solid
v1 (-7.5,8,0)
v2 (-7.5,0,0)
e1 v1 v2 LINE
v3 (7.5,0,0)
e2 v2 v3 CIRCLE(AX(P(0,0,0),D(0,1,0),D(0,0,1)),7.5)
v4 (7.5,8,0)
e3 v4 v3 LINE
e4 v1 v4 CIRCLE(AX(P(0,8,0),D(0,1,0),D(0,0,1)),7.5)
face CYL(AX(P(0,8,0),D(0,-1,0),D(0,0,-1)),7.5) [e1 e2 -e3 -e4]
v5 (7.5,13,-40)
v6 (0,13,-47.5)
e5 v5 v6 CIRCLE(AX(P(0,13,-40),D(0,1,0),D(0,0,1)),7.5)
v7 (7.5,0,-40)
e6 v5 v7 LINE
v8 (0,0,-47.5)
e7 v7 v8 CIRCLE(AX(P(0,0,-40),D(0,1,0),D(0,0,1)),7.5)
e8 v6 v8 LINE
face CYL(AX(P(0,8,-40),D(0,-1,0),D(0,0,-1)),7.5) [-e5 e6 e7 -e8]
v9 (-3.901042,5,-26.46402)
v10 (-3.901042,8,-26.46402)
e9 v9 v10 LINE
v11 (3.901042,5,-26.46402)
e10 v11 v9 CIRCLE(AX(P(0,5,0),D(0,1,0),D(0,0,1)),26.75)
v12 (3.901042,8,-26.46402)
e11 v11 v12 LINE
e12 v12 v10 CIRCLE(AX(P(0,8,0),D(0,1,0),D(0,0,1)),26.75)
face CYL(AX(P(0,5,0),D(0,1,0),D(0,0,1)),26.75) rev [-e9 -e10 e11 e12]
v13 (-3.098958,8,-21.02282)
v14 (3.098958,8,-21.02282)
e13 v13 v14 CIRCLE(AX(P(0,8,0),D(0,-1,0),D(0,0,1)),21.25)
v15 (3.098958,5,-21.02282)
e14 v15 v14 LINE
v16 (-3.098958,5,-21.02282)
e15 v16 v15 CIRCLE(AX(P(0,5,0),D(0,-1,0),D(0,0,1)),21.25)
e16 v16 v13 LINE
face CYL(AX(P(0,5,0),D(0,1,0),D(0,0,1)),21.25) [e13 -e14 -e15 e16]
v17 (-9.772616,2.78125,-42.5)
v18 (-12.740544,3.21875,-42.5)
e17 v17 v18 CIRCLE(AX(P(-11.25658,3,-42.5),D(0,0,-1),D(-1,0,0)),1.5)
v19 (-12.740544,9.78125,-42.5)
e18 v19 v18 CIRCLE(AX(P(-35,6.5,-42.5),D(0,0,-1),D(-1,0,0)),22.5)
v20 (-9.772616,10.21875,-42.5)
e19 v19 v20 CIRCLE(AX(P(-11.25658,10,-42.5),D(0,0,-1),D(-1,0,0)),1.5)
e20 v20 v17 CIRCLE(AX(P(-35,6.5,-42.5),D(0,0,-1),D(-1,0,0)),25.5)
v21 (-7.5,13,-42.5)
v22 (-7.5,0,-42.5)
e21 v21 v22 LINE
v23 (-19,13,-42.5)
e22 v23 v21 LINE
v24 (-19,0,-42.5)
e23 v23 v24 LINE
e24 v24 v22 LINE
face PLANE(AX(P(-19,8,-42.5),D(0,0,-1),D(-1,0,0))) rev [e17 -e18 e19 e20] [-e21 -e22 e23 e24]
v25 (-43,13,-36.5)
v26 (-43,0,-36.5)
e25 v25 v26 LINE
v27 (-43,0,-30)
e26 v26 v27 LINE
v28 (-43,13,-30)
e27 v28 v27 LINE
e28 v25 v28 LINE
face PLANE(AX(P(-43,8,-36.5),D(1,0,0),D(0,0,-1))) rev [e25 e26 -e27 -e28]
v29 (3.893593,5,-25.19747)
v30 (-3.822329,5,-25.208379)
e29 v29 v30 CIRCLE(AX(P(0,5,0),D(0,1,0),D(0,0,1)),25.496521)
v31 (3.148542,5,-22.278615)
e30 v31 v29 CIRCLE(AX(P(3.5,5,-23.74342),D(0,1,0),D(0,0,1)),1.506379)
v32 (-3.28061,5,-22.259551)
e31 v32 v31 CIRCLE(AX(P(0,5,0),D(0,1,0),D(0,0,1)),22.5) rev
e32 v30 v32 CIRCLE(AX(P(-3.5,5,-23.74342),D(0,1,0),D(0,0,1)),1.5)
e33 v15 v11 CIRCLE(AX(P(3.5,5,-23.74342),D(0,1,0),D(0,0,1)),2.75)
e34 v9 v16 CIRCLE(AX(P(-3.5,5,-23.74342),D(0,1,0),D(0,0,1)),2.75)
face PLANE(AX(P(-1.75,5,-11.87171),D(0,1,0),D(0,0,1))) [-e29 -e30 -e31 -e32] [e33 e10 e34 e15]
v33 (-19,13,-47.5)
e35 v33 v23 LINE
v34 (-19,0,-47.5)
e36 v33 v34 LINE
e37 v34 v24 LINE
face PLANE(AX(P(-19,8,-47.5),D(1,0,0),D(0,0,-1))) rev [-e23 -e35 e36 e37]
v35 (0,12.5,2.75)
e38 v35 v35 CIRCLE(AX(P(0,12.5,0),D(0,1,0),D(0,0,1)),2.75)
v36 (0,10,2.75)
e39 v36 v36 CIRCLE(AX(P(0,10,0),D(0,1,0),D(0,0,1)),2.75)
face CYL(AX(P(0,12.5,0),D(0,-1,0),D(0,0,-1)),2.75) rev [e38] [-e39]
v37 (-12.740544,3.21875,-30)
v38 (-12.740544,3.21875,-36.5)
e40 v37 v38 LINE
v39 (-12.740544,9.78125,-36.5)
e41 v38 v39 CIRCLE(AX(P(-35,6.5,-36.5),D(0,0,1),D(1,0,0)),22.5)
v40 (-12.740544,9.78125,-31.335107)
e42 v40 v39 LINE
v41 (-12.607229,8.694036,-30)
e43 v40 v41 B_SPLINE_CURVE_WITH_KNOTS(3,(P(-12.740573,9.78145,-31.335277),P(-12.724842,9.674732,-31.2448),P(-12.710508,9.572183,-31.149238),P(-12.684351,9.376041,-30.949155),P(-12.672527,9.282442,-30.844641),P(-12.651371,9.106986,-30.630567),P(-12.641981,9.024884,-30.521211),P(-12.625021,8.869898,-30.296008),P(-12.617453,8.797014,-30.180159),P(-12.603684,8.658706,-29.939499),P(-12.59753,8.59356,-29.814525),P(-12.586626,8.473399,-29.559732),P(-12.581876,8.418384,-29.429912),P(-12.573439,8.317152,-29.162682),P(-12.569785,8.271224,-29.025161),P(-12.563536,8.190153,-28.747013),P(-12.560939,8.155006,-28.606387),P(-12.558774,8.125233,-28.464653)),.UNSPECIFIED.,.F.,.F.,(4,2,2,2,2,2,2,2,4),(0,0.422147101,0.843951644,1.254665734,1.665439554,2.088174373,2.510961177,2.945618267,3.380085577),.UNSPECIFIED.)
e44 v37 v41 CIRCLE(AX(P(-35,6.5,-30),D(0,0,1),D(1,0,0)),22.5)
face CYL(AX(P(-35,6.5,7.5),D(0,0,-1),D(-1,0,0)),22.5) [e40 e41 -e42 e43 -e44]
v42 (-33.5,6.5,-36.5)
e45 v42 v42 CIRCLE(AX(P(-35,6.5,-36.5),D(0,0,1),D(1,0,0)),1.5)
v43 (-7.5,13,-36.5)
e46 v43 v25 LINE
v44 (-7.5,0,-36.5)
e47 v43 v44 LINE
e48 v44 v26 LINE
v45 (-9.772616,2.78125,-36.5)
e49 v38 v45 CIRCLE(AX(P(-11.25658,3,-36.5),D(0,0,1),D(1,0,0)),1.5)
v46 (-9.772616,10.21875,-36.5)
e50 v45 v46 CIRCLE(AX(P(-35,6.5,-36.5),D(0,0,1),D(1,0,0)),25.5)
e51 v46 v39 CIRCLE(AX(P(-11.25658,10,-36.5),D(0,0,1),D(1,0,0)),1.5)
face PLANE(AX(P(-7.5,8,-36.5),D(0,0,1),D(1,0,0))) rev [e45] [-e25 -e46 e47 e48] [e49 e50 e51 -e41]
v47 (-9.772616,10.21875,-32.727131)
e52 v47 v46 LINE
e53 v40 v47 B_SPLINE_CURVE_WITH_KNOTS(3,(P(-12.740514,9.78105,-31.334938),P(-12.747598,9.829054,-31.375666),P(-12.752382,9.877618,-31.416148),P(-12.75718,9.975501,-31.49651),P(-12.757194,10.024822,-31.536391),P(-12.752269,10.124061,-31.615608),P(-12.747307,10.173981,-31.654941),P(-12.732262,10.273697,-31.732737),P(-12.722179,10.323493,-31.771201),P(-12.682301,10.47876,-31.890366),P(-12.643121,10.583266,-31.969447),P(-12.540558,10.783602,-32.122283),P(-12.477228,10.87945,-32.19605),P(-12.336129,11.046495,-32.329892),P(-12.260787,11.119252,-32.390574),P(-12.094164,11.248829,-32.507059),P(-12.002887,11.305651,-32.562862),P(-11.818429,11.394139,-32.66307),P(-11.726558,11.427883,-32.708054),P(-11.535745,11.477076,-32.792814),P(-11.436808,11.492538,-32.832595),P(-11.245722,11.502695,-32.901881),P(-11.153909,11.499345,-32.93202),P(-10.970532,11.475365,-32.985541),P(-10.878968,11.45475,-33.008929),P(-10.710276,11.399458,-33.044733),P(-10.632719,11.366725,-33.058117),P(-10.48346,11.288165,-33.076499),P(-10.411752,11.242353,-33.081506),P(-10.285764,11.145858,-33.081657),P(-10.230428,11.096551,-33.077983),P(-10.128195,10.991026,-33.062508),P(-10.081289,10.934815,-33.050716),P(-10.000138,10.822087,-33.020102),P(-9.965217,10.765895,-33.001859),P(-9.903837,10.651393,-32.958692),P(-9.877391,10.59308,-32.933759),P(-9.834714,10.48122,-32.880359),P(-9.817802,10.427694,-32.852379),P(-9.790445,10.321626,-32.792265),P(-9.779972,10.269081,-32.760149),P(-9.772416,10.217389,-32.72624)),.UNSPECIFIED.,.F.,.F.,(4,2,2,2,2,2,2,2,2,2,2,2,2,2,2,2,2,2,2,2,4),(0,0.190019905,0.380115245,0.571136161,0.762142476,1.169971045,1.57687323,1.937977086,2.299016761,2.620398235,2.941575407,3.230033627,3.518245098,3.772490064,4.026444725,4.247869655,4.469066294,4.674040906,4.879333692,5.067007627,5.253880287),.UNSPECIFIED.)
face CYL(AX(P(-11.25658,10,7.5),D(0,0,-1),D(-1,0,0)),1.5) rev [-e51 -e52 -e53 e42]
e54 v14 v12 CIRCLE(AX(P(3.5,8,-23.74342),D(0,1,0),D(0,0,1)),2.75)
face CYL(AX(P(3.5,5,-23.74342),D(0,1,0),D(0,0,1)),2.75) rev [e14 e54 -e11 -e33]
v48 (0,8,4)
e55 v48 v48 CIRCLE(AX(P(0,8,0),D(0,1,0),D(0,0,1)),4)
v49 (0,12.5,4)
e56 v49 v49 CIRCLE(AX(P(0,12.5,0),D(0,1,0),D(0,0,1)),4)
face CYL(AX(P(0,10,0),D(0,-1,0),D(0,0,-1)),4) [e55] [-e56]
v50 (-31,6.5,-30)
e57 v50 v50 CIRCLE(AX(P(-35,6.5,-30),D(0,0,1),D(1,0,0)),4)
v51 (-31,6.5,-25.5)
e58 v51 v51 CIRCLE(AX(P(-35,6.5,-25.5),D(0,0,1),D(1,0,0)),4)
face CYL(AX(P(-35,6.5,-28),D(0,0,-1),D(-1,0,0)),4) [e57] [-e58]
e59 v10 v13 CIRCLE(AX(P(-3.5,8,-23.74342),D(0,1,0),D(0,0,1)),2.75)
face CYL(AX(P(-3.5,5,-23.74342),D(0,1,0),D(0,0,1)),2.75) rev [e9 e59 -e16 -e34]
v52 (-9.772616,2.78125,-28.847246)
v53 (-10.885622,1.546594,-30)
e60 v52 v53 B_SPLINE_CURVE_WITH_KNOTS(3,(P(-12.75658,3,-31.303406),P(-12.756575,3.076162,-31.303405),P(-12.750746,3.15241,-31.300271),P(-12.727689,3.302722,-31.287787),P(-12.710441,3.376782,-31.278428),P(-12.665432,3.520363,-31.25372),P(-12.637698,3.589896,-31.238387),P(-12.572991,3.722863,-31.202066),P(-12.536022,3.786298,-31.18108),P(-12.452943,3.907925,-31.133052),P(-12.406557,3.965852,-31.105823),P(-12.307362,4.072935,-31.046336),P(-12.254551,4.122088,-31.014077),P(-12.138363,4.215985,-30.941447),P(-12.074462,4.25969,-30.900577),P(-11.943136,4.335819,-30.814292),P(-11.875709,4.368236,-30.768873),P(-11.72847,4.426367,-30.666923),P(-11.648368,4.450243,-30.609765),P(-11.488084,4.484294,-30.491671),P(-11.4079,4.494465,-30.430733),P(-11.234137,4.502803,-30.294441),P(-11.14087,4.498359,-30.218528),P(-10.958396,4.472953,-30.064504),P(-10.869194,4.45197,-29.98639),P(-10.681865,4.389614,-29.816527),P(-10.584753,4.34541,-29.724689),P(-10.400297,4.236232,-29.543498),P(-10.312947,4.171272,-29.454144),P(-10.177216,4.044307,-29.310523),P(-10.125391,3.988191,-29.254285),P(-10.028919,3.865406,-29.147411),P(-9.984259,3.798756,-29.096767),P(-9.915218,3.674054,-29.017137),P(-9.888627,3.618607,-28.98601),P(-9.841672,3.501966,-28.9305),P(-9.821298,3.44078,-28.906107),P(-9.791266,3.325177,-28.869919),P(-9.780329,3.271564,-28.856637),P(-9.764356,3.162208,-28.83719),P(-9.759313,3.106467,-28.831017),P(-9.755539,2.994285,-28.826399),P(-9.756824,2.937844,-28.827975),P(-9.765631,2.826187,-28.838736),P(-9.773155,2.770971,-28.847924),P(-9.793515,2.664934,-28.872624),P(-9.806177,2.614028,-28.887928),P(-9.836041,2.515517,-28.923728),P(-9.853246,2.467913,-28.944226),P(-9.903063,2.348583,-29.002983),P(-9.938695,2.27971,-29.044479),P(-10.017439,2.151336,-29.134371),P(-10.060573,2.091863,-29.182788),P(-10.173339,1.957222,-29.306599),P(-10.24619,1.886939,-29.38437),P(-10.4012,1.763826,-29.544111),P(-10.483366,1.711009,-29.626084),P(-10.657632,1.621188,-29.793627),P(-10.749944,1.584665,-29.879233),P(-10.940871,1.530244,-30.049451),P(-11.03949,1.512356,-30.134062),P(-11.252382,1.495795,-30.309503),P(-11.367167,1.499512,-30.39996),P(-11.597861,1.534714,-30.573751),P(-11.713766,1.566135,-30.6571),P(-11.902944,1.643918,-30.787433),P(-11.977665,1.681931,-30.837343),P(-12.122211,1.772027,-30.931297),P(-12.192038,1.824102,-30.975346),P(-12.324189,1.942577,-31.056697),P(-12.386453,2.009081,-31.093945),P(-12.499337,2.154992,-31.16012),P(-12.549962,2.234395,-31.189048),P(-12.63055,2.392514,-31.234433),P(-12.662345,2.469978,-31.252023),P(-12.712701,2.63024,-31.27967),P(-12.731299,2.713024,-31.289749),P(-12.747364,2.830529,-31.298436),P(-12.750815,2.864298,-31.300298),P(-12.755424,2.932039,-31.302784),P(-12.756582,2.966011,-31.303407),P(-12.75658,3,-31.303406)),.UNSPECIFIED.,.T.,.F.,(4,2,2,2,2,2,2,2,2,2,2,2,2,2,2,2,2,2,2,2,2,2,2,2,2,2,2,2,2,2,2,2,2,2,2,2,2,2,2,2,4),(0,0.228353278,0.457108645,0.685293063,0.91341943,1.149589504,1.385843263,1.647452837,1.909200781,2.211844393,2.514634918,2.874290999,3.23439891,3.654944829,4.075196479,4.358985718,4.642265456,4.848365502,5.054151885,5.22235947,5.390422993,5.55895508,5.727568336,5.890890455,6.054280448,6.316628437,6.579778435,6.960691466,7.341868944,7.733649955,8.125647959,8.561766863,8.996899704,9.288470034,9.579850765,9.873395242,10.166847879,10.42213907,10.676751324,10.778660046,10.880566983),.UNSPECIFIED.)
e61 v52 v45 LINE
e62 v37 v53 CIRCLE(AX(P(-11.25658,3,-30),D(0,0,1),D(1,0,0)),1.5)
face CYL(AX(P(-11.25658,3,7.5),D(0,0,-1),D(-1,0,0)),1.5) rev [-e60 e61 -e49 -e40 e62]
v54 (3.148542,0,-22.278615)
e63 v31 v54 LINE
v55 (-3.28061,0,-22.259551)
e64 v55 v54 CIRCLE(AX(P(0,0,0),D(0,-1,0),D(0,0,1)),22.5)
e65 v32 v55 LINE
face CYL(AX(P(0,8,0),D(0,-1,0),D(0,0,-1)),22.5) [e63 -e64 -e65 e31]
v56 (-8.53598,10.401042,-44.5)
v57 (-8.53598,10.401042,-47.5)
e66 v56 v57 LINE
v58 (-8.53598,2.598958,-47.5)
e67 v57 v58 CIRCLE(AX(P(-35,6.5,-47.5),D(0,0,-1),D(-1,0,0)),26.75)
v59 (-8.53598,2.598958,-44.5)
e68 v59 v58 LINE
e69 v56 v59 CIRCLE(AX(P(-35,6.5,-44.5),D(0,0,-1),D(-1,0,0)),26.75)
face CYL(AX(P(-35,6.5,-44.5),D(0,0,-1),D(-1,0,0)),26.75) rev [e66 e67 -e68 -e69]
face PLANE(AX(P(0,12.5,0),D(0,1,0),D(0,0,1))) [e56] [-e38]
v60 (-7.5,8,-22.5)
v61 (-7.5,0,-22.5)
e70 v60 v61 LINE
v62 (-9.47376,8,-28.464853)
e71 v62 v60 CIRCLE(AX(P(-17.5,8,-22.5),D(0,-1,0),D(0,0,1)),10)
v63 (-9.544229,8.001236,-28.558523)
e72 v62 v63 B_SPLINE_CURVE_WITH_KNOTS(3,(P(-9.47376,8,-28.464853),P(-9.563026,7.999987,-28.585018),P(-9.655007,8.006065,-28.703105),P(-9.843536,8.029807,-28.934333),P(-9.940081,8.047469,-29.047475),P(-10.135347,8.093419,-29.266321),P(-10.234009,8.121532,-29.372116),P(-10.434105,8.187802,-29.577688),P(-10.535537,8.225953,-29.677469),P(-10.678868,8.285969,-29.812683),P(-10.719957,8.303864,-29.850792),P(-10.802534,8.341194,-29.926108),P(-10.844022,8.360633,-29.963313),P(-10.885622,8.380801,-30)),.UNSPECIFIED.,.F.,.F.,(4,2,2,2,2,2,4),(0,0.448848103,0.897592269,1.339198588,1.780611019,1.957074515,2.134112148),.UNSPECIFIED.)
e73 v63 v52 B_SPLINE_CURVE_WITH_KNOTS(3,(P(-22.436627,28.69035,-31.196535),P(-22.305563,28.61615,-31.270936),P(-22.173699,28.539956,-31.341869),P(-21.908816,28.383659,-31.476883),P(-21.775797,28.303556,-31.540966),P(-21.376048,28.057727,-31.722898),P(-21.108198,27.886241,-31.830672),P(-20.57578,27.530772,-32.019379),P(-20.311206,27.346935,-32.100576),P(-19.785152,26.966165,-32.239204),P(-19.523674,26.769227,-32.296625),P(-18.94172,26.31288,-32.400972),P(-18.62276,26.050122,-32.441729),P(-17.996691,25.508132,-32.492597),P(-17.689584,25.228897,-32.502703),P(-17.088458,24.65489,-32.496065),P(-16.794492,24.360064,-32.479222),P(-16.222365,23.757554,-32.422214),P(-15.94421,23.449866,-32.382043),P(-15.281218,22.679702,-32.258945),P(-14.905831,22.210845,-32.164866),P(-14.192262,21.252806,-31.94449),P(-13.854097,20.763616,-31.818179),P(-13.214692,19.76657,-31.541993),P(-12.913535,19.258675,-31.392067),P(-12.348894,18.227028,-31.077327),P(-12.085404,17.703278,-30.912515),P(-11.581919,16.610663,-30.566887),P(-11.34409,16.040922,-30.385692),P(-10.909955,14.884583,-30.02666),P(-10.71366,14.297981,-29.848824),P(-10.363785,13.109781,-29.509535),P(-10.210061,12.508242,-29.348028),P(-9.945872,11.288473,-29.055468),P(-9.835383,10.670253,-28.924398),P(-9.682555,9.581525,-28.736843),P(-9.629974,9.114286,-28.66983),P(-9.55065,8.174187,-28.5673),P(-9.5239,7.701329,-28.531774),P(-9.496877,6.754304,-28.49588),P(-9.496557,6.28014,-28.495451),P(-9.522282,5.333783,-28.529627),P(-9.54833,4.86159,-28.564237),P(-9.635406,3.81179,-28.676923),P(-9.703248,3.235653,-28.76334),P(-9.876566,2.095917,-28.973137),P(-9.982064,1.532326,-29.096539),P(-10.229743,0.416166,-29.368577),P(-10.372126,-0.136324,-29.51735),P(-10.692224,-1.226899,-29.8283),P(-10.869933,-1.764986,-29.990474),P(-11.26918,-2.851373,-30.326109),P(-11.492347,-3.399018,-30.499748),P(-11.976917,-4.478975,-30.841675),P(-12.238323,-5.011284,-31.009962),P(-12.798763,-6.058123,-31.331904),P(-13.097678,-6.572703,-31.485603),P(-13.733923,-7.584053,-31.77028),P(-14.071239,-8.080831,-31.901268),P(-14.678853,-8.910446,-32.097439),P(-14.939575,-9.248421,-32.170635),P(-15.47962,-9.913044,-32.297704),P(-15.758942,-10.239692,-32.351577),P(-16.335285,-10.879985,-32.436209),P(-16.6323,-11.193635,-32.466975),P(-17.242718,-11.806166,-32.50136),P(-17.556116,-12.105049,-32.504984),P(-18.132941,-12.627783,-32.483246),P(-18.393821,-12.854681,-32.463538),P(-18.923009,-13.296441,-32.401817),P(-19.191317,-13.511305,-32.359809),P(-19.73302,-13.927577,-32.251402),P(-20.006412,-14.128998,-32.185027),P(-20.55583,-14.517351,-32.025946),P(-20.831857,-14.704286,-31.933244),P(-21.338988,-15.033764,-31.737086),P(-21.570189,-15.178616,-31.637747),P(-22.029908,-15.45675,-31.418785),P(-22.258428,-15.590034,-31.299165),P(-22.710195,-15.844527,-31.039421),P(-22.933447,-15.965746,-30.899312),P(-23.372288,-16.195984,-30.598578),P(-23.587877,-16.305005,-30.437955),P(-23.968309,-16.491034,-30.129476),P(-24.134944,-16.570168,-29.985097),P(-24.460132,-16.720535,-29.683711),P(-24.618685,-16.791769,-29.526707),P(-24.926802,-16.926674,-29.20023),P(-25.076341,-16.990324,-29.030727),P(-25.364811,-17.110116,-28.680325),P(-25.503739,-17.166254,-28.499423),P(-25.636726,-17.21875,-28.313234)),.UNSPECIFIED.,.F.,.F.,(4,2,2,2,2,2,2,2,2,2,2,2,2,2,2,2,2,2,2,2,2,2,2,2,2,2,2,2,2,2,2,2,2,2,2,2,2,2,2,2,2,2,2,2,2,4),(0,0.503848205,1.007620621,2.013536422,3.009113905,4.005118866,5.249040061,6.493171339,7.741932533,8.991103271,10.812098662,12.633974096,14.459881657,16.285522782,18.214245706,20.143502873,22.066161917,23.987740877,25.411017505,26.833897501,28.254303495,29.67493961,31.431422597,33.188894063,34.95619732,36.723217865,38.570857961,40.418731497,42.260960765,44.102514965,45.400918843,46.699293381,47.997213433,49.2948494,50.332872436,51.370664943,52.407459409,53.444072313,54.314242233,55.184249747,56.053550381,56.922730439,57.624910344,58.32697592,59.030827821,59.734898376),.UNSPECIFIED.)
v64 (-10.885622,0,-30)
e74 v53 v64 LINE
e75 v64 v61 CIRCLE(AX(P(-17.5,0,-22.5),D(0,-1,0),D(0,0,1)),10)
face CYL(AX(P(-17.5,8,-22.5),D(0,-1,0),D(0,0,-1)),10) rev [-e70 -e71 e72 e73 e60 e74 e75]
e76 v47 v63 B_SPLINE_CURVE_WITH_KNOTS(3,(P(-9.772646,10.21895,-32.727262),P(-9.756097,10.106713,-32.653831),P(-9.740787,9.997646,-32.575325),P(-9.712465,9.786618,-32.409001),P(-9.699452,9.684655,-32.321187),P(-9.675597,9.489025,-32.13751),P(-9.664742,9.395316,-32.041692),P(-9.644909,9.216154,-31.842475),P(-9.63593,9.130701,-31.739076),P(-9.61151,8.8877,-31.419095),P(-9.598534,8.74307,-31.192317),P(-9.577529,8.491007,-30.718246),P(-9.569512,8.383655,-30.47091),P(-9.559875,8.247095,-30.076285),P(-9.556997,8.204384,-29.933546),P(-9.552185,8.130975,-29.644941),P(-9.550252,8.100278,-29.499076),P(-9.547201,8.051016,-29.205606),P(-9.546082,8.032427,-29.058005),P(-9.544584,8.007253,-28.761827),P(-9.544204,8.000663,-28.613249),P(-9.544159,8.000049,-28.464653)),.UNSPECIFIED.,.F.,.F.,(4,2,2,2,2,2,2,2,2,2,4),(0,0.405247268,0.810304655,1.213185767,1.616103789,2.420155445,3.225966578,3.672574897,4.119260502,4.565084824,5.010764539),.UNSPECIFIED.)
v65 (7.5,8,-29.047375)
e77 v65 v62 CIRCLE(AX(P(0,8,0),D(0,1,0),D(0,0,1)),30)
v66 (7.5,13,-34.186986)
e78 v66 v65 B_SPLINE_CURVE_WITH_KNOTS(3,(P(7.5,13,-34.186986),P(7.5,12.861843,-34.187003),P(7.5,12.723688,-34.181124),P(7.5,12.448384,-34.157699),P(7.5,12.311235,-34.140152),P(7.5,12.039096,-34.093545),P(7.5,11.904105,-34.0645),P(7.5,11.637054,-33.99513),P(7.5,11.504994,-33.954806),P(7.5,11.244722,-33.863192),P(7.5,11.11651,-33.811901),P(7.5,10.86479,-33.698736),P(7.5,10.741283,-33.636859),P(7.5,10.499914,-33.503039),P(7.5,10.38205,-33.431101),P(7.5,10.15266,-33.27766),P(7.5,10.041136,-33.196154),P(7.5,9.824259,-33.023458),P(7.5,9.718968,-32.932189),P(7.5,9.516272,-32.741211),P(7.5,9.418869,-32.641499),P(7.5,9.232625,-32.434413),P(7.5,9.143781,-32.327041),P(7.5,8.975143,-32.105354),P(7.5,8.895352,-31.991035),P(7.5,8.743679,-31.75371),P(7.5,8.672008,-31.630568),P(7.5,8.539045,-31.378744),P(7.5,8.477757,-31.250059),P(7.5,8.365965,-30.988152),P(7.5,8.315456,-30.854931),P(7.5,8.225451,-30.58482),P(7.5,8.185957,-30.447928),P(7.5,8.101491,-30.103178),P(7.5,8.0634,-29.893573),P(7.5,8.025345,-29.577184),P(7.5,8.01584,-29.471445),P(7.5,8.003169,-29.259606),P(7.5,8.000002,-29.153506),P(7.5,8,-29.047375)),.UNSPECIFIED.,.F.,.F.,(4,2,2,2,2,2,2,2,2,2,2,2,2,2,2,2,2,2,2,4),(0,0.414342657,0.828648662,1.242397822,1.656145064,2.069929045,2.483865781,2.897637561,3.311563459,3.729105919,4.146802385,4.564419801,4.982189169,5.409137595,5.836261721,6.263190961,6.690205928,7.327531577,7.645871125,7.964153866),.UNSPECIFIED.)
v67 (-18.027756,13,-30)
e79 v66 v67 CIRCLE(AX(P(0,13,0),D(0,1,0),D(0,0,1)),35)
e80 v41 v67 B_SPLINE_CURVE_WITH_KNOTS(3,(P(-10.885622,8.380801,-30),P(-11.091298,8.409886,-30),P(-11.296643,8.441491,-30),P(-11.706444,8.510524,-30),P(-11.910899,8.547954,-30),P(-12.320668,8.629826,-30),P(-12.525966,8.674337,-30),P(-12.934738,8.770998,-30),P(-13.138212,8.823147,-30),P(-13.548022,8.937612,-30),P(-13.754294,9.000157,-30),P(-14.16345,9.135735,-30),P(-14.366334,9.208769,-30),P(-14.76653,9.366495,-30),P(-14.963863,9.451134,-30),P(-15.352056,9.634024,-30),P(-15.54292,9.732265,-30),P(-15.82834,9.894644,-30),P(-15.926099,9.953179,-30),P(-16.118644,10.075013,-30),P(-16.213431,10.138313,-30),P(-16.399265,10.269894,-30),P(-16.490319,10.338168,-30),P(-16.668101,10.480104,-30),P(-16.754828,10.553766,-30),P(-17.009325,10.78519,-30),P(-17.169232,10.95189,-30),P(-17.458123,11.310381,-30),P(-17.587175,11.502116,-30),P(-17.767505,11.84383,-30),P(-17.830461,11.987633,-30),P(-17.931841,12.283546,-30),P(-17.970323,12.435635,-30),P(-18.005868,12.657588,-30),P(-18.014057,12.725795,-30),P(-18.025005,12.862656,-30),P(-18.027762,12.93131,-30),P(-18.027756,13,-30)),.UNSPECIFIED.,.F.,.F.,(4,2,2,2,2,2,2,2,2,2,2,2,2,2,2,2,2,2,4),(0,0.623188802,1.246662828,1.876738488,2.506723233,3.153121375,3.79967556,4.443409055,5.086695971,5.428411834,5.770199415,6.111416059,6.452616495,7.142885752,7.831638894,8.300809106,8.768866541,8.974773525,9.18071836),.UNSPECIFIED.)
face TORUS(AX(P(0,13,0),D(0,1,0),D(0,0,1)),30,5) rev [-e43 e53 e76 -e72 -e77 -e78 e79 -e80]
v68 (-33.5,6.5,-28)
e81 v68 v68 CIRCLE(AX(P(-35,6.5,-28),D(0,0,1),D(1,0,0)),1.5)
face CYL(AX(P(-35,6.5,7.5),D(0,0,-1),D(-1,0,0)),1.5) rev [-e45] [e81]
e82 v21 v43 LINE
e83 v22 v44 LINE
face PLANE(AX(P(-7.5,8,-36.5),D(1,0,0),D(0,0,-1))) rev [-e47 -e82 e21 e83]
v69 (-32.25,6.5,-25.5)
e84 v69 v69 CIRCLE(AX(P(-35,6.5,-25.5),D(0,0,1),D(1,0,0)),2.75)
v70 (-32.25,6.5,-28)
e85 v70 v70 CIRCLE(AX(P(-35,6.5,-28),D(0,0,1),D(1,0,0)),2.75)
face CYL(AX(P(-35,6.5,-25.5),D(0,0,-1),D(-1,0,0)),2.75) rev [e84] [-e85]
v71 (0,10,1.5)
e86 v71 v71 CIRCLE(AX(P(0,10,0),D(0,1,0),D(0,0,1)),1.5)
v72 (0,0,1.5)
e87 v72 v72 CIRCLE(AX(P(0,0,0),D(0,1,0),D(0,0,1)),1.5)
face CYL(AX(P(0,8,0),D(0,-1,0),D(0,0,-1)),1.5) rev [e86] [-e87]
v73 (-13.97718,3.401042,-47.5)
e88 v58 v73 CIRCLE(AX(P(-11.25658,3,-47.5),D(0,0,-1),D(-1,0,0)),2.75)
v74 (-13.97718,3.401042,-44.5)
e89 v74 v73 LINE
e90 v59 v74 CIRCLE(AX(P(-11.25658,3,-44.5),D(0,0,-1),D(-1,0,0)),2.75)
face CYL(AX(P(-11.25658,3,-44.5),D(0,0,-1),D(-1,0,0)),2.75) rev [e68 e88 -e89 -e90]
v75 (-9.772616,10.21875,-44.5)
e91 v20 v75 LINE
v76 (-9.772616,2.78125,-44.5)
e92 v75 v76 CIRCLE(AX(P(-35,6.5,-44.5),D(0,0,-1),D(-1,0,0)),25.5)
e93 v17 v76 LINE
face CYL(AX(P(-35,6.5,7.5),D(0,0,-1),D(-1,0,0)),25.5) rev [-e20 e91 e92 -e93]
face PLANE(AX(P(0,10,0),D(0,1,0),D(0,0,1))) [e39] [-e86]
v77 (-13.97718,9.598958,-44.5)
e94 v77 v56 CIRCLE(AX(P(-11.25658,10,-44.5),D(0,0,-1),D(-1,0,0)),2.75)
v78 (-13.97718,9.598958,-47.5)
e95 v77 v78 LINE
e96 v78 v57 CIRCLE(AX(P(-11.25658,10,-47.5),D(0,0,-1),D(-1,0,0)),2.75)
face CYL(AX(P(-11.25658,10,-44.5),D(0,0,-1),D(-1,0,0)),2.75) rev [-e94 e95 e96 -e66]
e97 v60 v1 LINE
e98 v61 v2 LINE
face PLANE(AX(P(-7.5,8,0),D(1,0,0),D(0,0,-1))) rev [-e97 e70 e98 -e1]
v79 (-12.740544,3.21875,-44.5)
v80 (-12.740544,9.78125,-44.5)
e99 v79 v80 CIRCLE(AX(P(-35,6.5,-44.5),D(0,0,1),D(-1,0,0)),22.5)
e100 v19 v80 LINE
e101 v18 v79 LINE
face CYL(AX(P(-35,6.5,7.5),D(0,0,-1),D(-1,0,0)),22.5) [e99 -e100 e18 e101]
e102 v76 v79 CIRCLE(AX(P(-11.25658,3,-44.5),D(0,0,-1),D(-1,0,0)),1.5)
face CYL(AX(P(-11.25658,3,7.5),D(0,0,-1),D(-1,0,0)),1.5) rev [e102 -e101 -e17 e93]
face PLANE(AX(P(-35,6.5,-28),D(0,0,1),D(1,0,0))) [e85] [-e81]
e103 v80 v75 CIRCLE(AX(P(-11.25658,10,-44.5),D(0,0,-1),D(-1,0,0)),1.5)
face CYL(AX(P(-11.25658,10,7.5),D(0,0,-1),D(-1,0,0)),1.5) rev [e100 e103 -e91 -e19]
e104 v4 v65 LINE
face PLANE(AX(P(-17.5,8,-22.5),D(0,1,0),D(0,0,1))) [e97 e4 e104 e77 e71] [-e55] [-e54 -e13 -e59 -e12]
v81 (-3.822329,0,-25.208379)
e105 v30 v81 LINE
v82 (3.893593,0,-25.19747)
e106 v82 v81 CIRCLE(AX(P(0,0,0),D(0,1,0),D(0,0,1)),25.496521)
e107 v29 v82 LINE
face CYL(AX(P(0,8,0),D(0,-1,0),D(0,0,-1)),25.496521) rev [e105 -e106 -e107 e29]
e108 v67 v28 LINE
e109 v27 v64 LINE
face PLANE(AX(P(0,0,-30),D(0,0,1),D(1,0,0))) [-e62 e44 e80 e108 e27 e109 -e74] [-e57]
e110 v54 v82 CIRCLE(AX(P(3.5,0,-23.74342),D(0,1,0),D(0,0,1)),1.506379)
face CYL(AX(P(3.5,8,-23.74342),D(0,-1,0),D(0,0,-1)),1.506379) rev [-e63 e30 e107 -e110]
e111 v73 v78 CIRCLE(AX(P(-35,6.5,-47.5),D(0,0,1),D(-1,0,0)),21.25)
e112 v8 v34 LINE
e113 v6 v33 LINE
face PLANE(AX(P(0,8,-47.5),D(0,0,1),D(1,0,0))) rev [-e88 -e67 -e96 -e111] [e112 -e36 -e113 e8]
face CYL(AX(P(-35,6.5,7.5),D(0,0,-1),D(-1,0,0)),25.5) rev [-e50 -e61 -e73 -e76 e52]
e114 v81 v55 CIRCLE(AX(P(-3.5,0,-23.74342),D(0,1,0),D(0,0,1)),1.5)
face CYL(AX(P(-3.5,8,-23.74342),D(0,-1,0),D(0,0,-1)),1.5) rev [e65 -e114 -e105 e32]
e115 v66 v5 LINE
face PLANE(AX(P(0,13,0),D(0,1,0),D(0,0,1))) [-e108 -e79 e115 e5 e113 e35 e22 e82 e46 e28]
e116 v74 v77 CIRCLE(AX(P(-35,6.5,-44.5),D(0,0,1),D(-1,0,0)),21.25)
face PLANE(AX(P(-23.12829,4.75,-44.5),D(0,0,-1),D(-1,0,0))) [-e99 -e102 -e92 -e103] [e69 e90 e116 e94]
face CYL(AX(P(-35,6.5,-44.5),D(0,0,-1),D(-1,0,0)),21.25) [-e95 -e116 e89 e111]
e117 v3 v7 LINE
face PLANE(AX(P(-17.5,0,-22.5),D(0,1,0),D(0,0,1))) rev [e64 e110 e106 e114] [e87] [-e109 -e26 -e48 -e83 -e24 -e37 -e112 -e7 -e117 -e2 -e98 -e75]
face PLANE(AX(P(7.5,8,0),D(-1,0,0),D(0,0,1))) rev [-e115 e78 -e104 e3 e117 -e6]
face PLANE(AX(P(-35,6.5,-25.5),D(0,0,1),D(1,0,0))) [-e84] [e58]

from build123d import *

# Parameters (mm, degrees)
SKETCH1_R           = 1.5
BOSS_EXTRUDE1_DEPTH = 8
SKETCH2_R           = 4
SKETCH2_R_2         = 1.5
BOSS_EXTRUDE2_DEPTH = 2
SKETCH4_R           = 4
SKETCH4_R_2         = 2.75
BOSS_EXTRUDE3_DEPTH = 2.5
CUT_EXTRUDE1_DEPTH  = 3
BOSS_EXTRUDE4_DEPTH = 5
BOSS_EXTRUDE5_DEPTH = 2.5
BOSS_EXTRUDE6_DEPTH = 13
BOSS_EXTRUDE7_DEPTH = 8
CUT_EXTRUDE4_START  = -5
SKETCH16_R          = 35.00000000000001
SKETCH16_R_2        = 33.50186054017001
CUT_EXTRUDE4_DEPTH  = 5
FILLET2_R           = 5
SKETCH6_R           = 1.500000000000004
CUT_EXTRUDE5_DEPTH  = 72.01408318918156
SKETCH6_8_R         = 1.500000000000004
CUT_EXTRUDE6_DEPTH  = 3
SKETCH17_R          = 3.999999999999999
SKETCH17_R_2        = 1.500000000000004
BOSS_EXTRUDE8_DEPTH = 2
SKETCH18_R          = 4.000000000000003
SKETCH18_R_2        = 2.7500000000000018
BOSS_EXTRUDE9_DEPTH = 2.5


with BuildPart() as part:
    # Sketch1 → Boss-Extrude1 (new body)
    with BuildSketch(Plane(origin=(0, 0, 0), x_dir=(1, 0, 0), z_dir=(0, 1, 0))):
        with BuildLine():
            Line((-7.5, 36.50000000000001), (-43, 36.5))
            Line((-43, 36.5), (-43, 32.5))
            Line((-43, 32.5), (-17.500000000000068, 32.49999999999999))
            ThreePointArc((-17.500000000000068, 32.49999999999999), (-10.428932188134521, 29.571067811865472), (-7.499999999999997, 22.499999999999922))
            Line((-7.499999999999997, 22.499999999999922), (-7.5, 0))
            ThreePointArc((-7.5, 0), (-1.38e-15, -7.5), (7.5, 0))
            Line((7.5, 0), (7.5, 40))
            ThreePointArc((7.5, 40), (5.303300858899107, 45.30330085889911), (1.7e-16, 47.5))
            Line((1.7e-16, 47.5), (-19, 47.5))
            Line((-19, 47.5), (-19, 42.5))
            Line((-19, 42.5), (-7.5, 42.5))
            Line((-7.5, 42.5), (-7.5, 36.50000000000001))
        make_face()
        with Locations(Location((0, 0, 0), (0, 0, 270))):
            Circle(SKETCH1_R, mode=Mode.SUBTRACT)
        with BuildLine():
            ThreePointArc((-3.822328563123411, 25.208378945159915), (-4.975312131849936, 23.47239594738329), (-3.2806101420555054, 22.2595508442844))
            ThreePointArc((-3.2806101420555054, 22.2595508442844), (-0.0667184196164731, 22.499901229693076), (3.1485421826830366, 22.278615056087435))
            ThreePointArc((3.1485421826830366, 22.278615056087435), (4.959579589511544, 23.370856111085427), (3.8935926199376825, 25.19747013486111))
            ThreePointArc((3.8935926199376825, 25.19747013486111), (0.03604708010283943, 25.496495157085157), (-3.822328563123411, 25.208378945159915))
        make_face(mode=Mode.SUBTRACT)
    extrude(amount=BOSS_EXTRUDE1_DEPTH)

    # Sketch2 → Boss-Extrude2 (add)
    with BuildSketch(Plane(origin=(0, 8, 0), x_dir=(1, 0, 0), z_dir=(0, 1, 0))):
        with Locations(Location((0, 0, 0), (0, 0, 270))):
            Circle(SKETCH2_R)
        with Locations(Location((0, 0, 0), (0, 0, 270))):
            Circle(SKETCH2_R_2, mode=Mode.SUBTRACT)
    extrude(amount=BOSS_EXTRUDE2_DEPTH)

    # Sketch4 → Boss-Extrude3 (add)
    with BuildSketch(Plane(origin=(0, 10, 0), x_dir=(1, 0, 0), z_dir=(0, 1, 0))):
        with Locations(Location((0, 0, 0), (0, 0, 270))):
            Circle(SKETCH4_R)
        with Locations(Location((0, 0, 0), (0, 0, 270))):
            Circle(SKETCH4_R_2, mode=Mode.SUBTRACT)
    extrude(amount=BOSS_EXTRUDE3_DEPTH)

    # Sketch5 → Cut-Extrude1 (cut)
    with BuildSketch(Plane(origin=(0, 8, 0), x_dir=(1, 0, 0), z_dir=(0, 1, 0))):
        with BuildLine():
            ThreePointArc((-3.901041666666667, 26.46402036567631), (-6.220600224508779, 23.342378474500862), (-3.098958333333334, 21.022819916658754))
            ThreePointArc((-3.098958333333334, 21.022819916658754), (1.3e-15, 21.250000000000004), (3.098958333333334, 21.022819916658754))
            ThreePointArc((3.098958333333334, 21.022819916658754), (6.220600224508775, 23.342378474500865), (3.901041666666667, 26.46402036567631))
            ThreePointArc((3.901041666666667, 26.46402036567631), (1.64e-15, 26.749999999999996), (-3.901041666666667, 26.46402036567631))
        make_face()
    extrude(amount=-CUT_EXTRUDE1_DEPTH, mode=Mode.SUBTRACT)

    # Sketch11 → Boss-Extrude4 (add)
    with BuildSketch(Plane(origin=(0, 8, 0), x_dir=(1, 0, 0), z_dir=(0, 1, 0))):
        with BuildLine():
            Line((-19, 42.5), (-7.5, 42.5))
            Line((-7.5, 42.5), (-7.5, 36.50000000000001))
            Line((-7.5, 36.50000000000001), (-43, 36.5))
            Line((-43, 36.5), (-43, 32.5))
            Line((-43, 32.5), (-17.500000000000064, 32.49999999999999))
            ThreePointArc((-17.500000000000064, 32.49999999999999), (-15.859503936382302, 32.36452090398995), (-14.263458457505935, 31.961754533050943))
            ThreePointArc((-14.263458457505937, 31.961754533050936), (-3.5600570438609966, 34.81847202053036), (7.5, 34.18698582794336))
            Line((7.5, 34.18698582794336), (7.5, 40))
            ThreePointArc((7.5, 40), (5.303300858899107, 45.30330085889911), (1.3e-16, 47.5))
            Line((9.2e-16, 47.5), (-19, 47.5))
            Line((-19, 47.5), (-19, 42.5))
        make_face()
    extrude(amount=BOSS_EXTRUDE4_DEPTH)

    # Sketch12 → Boss-Extrude5 (add)
    with BuildSketch(Plane.XY.offset(-32.499999999999986)):
        Polygon((-43.00000000000001, 0), (-17.500000000000078, 0), (-17.500000000000085, 13.000000000000002), (-43.00000000000001, 13.000000000000002), align=None)
    extrude(amount=BOSS_EXTRUDE5_DEPTH)

    # Sketch14 → Boss-Extrude6 (add)
    with BuildSketch(Plane(origin=(0, 0, 0), x_dir=(1, 0, 0), z_dir=(0, 1, 0))):
        with BuildLine():
            Line((-17.500000000000068, 30.310889132455326), (-17.500000000000075, 32.49999999999999))
            ThreePointArc((-17.500000000000075, 32.49999999999999), (-15.859503936382307, 32.364520903989956), (-14.263458457505932, 31.961754533050946))
            ThreePointArc((-14.263458457505932, 31.961754533050946), (-15.903165170435354, 31.178347255136085), (-17.500000000000068, 30.310889132455326))
        make_face()
    extrude(amount=BOSS_EXTRUDE6_DEPTH)

    # Sketch15 → Boss-Extrude7 (add)
    with BuildSketch(Plane(origin=(0, 0, 0), x_dir=(1, 0, 0), z_dir=(0, 1, 0))):
        with BuildLine():
            Line((-17.500000000000075, 29.99999999999999), (-17.500000000000068, 30.310889132455326))
            ThreePointArc((-17.500000000000068, 30.310889132455326), (-15.90316517043534, 31.178347255136092), (-14.263458457505916, 31.961754533050954))
            ThreePointArc((-14.263458457505916, 31.961754533050954), (-12.477821634213894, 31.14741143130302), (-10.8856217223385, 29.99999999999999))
            Line((-10.8856217223385, 29.99999999999999), (-17.500000000000075, 29.99999999999999))
        make_face()
    extrude(amount=BOSS_EXTRUDE7_DEPTH)

    # Sketch16 → Cut-Extrude4 (cut)
    with BuildSketch(Plane(origin=(0, 13.000000000000002, 0), x_dir=(1, 0, 0), z_dir=(0, 1, 0)).offset(CUT_EXTRUDE4_START)):
        Circle(SKETCH16_R)
        Circle(SKETCH16_R_2, mode=Mode.SUBTRACT)
    extrude(amount=CUT_EXTRUDE4_DEPTH, mode=Mode.SUBTRACT)

    # Fillet2
    fillet2_edges = [part.edges().sort_by_distance(p)[0] for p in [
        (-5.664903014694951, 8, -34.5385129071027),
    ]]
    fillet(fillet2_edges, radius=FILLET2_R - 0.0001)  # a hair under: the kernel refuses the full size

    # Sketch6 → Cut-Extrude5 (cut, through all)
    with BuildSketch(Plane(origin=(0, 0, -47.5), x_dir=(-1, 0, 0), z_dir=(0, 0, -1))):
        with BuildLine():
            ThreePointArc((12.740543617655444, 9.78125), (11.475329858832474, 11.483963758822968), (9.772616100009506, 10.21875))
            ThreePointArc((9.772616100009506, 10.21875), (9.50000000000001, 6.5000000000000036), (9.772616100009508, 2.7812499999999982))
            ThreePointArc((9.772616100009508, 2.7812499999999982), (11.475329858832469, 1.5160362411770363), (12.740543617655444, 3.218749999999997))
            ThreePointArc((12.740543617655444, 3.218749999999997), (12.500000000000004, 6.500000000000003), (12.740543617655444, 9.78125))
        make_face()
        with Locations(Location((35, 6.5, 0), (0, 0, 180))):
            Circle(SKETCH6_R)
    extrude(amount=-CUT_EXTRUDE5_DEPTH, mode=Mode.SUBTRACT)

    # Sketch6<8> → Cut-Extrude6 (cut)
    # profile 1 of 2: a face of its own
    with BuildSketch(Plane(origin=(0, 0, -47.5), x_dir=(-1, 0, 0), z_dir=(0, 0, -1))):
        with Locations(Location((35, 6.5, 0), (0, 0, 180))):
            Circle(SKETCH6_8_R)
    # profile 2 of 2: a face of its own
    with BuildSketch(Plane(origin=(0, 0, -47.5), x_dir=(-1, 0, 0), z_dir=(0, 0, -1))):
        with BuildLine():
            ThreePointArc((13.977180083341253, 9.598958333333332), (11.65762152549914, 12.720600224508777), (8.535979634323695, 10.401041666666664))
            ThreePointArc((8.535979634323695, 10.401041666666664), (8.250000000000007, 6.5000000000000036), (8.535979634323692, 2.5989583333333335))
            ThreePointArc((8.535979634323692, 2.5989583333333335), (11.657621525499136, 0.27939977549122075), (13.97718008334125, 3.401041666666666))
            ThreePointArc((13.97718008334125, 3.401041666666666), (13.750000000000004, 6.500000000000003), (13.977180083341253, 9.598958333333332))
        make_face()
        with BuildLine():
            ThreePointArc((12.740543617655444, 9.78125), (11.475329858832474, 11.483963758822968), (9.772616100009506, 10.21875))
            ThreePointArc((9.772616100009506, 10.21875), (9.50000000000001, 6.5000000000000036), (9.772616100009508, 2.7812499999999982))
            ThreePointArc((9.772616100009508, 2.7812499999999982), (11.475329858832469, 1.5160362411770363), (12.740543617655444, 3.218749999999997))
            ThreePointArc((12.740543617655444, 3.218749999999997), (12.500000000000004, 6.500000000000003), (12.740543617655444, 9.78125))
        make_face(mode=Mode.SUBTRACT)
    extrude(amount=-CUT_EXTRUDE6_DEPTH, mode=Mode.SUBTRACT)

    # Sketch17 → Boss-Extrude8 (add)
    with BuildSketch(Plane.XY.offset(-29.99999999999999)):
        with Locations((-35, 6.5)):
            Circle(SKETCH17_R)
        with Locations((-35, 6.5)):
            Circle(SKETCH17_R_2, mode=Mode.SUBTRACT)
    extrude(amount=BOSS_EXTRUDE8_DEPTH)

    # Sketch18 → Boss-Extrude9 (add)
    with BuildSketch(Plane.XY.offset(-27.99999999999999)):
        with Locations((-35, 6.5)):
            Circle(SKETCH18_R)
        with Locations((-35, 6.5)):
            Circle(SKETCH18_R_2, mode=Mode.SUBTRACT)
    extrude(amount=BOSS_EXTRUDE9_DEPTH)


solid = part.part
